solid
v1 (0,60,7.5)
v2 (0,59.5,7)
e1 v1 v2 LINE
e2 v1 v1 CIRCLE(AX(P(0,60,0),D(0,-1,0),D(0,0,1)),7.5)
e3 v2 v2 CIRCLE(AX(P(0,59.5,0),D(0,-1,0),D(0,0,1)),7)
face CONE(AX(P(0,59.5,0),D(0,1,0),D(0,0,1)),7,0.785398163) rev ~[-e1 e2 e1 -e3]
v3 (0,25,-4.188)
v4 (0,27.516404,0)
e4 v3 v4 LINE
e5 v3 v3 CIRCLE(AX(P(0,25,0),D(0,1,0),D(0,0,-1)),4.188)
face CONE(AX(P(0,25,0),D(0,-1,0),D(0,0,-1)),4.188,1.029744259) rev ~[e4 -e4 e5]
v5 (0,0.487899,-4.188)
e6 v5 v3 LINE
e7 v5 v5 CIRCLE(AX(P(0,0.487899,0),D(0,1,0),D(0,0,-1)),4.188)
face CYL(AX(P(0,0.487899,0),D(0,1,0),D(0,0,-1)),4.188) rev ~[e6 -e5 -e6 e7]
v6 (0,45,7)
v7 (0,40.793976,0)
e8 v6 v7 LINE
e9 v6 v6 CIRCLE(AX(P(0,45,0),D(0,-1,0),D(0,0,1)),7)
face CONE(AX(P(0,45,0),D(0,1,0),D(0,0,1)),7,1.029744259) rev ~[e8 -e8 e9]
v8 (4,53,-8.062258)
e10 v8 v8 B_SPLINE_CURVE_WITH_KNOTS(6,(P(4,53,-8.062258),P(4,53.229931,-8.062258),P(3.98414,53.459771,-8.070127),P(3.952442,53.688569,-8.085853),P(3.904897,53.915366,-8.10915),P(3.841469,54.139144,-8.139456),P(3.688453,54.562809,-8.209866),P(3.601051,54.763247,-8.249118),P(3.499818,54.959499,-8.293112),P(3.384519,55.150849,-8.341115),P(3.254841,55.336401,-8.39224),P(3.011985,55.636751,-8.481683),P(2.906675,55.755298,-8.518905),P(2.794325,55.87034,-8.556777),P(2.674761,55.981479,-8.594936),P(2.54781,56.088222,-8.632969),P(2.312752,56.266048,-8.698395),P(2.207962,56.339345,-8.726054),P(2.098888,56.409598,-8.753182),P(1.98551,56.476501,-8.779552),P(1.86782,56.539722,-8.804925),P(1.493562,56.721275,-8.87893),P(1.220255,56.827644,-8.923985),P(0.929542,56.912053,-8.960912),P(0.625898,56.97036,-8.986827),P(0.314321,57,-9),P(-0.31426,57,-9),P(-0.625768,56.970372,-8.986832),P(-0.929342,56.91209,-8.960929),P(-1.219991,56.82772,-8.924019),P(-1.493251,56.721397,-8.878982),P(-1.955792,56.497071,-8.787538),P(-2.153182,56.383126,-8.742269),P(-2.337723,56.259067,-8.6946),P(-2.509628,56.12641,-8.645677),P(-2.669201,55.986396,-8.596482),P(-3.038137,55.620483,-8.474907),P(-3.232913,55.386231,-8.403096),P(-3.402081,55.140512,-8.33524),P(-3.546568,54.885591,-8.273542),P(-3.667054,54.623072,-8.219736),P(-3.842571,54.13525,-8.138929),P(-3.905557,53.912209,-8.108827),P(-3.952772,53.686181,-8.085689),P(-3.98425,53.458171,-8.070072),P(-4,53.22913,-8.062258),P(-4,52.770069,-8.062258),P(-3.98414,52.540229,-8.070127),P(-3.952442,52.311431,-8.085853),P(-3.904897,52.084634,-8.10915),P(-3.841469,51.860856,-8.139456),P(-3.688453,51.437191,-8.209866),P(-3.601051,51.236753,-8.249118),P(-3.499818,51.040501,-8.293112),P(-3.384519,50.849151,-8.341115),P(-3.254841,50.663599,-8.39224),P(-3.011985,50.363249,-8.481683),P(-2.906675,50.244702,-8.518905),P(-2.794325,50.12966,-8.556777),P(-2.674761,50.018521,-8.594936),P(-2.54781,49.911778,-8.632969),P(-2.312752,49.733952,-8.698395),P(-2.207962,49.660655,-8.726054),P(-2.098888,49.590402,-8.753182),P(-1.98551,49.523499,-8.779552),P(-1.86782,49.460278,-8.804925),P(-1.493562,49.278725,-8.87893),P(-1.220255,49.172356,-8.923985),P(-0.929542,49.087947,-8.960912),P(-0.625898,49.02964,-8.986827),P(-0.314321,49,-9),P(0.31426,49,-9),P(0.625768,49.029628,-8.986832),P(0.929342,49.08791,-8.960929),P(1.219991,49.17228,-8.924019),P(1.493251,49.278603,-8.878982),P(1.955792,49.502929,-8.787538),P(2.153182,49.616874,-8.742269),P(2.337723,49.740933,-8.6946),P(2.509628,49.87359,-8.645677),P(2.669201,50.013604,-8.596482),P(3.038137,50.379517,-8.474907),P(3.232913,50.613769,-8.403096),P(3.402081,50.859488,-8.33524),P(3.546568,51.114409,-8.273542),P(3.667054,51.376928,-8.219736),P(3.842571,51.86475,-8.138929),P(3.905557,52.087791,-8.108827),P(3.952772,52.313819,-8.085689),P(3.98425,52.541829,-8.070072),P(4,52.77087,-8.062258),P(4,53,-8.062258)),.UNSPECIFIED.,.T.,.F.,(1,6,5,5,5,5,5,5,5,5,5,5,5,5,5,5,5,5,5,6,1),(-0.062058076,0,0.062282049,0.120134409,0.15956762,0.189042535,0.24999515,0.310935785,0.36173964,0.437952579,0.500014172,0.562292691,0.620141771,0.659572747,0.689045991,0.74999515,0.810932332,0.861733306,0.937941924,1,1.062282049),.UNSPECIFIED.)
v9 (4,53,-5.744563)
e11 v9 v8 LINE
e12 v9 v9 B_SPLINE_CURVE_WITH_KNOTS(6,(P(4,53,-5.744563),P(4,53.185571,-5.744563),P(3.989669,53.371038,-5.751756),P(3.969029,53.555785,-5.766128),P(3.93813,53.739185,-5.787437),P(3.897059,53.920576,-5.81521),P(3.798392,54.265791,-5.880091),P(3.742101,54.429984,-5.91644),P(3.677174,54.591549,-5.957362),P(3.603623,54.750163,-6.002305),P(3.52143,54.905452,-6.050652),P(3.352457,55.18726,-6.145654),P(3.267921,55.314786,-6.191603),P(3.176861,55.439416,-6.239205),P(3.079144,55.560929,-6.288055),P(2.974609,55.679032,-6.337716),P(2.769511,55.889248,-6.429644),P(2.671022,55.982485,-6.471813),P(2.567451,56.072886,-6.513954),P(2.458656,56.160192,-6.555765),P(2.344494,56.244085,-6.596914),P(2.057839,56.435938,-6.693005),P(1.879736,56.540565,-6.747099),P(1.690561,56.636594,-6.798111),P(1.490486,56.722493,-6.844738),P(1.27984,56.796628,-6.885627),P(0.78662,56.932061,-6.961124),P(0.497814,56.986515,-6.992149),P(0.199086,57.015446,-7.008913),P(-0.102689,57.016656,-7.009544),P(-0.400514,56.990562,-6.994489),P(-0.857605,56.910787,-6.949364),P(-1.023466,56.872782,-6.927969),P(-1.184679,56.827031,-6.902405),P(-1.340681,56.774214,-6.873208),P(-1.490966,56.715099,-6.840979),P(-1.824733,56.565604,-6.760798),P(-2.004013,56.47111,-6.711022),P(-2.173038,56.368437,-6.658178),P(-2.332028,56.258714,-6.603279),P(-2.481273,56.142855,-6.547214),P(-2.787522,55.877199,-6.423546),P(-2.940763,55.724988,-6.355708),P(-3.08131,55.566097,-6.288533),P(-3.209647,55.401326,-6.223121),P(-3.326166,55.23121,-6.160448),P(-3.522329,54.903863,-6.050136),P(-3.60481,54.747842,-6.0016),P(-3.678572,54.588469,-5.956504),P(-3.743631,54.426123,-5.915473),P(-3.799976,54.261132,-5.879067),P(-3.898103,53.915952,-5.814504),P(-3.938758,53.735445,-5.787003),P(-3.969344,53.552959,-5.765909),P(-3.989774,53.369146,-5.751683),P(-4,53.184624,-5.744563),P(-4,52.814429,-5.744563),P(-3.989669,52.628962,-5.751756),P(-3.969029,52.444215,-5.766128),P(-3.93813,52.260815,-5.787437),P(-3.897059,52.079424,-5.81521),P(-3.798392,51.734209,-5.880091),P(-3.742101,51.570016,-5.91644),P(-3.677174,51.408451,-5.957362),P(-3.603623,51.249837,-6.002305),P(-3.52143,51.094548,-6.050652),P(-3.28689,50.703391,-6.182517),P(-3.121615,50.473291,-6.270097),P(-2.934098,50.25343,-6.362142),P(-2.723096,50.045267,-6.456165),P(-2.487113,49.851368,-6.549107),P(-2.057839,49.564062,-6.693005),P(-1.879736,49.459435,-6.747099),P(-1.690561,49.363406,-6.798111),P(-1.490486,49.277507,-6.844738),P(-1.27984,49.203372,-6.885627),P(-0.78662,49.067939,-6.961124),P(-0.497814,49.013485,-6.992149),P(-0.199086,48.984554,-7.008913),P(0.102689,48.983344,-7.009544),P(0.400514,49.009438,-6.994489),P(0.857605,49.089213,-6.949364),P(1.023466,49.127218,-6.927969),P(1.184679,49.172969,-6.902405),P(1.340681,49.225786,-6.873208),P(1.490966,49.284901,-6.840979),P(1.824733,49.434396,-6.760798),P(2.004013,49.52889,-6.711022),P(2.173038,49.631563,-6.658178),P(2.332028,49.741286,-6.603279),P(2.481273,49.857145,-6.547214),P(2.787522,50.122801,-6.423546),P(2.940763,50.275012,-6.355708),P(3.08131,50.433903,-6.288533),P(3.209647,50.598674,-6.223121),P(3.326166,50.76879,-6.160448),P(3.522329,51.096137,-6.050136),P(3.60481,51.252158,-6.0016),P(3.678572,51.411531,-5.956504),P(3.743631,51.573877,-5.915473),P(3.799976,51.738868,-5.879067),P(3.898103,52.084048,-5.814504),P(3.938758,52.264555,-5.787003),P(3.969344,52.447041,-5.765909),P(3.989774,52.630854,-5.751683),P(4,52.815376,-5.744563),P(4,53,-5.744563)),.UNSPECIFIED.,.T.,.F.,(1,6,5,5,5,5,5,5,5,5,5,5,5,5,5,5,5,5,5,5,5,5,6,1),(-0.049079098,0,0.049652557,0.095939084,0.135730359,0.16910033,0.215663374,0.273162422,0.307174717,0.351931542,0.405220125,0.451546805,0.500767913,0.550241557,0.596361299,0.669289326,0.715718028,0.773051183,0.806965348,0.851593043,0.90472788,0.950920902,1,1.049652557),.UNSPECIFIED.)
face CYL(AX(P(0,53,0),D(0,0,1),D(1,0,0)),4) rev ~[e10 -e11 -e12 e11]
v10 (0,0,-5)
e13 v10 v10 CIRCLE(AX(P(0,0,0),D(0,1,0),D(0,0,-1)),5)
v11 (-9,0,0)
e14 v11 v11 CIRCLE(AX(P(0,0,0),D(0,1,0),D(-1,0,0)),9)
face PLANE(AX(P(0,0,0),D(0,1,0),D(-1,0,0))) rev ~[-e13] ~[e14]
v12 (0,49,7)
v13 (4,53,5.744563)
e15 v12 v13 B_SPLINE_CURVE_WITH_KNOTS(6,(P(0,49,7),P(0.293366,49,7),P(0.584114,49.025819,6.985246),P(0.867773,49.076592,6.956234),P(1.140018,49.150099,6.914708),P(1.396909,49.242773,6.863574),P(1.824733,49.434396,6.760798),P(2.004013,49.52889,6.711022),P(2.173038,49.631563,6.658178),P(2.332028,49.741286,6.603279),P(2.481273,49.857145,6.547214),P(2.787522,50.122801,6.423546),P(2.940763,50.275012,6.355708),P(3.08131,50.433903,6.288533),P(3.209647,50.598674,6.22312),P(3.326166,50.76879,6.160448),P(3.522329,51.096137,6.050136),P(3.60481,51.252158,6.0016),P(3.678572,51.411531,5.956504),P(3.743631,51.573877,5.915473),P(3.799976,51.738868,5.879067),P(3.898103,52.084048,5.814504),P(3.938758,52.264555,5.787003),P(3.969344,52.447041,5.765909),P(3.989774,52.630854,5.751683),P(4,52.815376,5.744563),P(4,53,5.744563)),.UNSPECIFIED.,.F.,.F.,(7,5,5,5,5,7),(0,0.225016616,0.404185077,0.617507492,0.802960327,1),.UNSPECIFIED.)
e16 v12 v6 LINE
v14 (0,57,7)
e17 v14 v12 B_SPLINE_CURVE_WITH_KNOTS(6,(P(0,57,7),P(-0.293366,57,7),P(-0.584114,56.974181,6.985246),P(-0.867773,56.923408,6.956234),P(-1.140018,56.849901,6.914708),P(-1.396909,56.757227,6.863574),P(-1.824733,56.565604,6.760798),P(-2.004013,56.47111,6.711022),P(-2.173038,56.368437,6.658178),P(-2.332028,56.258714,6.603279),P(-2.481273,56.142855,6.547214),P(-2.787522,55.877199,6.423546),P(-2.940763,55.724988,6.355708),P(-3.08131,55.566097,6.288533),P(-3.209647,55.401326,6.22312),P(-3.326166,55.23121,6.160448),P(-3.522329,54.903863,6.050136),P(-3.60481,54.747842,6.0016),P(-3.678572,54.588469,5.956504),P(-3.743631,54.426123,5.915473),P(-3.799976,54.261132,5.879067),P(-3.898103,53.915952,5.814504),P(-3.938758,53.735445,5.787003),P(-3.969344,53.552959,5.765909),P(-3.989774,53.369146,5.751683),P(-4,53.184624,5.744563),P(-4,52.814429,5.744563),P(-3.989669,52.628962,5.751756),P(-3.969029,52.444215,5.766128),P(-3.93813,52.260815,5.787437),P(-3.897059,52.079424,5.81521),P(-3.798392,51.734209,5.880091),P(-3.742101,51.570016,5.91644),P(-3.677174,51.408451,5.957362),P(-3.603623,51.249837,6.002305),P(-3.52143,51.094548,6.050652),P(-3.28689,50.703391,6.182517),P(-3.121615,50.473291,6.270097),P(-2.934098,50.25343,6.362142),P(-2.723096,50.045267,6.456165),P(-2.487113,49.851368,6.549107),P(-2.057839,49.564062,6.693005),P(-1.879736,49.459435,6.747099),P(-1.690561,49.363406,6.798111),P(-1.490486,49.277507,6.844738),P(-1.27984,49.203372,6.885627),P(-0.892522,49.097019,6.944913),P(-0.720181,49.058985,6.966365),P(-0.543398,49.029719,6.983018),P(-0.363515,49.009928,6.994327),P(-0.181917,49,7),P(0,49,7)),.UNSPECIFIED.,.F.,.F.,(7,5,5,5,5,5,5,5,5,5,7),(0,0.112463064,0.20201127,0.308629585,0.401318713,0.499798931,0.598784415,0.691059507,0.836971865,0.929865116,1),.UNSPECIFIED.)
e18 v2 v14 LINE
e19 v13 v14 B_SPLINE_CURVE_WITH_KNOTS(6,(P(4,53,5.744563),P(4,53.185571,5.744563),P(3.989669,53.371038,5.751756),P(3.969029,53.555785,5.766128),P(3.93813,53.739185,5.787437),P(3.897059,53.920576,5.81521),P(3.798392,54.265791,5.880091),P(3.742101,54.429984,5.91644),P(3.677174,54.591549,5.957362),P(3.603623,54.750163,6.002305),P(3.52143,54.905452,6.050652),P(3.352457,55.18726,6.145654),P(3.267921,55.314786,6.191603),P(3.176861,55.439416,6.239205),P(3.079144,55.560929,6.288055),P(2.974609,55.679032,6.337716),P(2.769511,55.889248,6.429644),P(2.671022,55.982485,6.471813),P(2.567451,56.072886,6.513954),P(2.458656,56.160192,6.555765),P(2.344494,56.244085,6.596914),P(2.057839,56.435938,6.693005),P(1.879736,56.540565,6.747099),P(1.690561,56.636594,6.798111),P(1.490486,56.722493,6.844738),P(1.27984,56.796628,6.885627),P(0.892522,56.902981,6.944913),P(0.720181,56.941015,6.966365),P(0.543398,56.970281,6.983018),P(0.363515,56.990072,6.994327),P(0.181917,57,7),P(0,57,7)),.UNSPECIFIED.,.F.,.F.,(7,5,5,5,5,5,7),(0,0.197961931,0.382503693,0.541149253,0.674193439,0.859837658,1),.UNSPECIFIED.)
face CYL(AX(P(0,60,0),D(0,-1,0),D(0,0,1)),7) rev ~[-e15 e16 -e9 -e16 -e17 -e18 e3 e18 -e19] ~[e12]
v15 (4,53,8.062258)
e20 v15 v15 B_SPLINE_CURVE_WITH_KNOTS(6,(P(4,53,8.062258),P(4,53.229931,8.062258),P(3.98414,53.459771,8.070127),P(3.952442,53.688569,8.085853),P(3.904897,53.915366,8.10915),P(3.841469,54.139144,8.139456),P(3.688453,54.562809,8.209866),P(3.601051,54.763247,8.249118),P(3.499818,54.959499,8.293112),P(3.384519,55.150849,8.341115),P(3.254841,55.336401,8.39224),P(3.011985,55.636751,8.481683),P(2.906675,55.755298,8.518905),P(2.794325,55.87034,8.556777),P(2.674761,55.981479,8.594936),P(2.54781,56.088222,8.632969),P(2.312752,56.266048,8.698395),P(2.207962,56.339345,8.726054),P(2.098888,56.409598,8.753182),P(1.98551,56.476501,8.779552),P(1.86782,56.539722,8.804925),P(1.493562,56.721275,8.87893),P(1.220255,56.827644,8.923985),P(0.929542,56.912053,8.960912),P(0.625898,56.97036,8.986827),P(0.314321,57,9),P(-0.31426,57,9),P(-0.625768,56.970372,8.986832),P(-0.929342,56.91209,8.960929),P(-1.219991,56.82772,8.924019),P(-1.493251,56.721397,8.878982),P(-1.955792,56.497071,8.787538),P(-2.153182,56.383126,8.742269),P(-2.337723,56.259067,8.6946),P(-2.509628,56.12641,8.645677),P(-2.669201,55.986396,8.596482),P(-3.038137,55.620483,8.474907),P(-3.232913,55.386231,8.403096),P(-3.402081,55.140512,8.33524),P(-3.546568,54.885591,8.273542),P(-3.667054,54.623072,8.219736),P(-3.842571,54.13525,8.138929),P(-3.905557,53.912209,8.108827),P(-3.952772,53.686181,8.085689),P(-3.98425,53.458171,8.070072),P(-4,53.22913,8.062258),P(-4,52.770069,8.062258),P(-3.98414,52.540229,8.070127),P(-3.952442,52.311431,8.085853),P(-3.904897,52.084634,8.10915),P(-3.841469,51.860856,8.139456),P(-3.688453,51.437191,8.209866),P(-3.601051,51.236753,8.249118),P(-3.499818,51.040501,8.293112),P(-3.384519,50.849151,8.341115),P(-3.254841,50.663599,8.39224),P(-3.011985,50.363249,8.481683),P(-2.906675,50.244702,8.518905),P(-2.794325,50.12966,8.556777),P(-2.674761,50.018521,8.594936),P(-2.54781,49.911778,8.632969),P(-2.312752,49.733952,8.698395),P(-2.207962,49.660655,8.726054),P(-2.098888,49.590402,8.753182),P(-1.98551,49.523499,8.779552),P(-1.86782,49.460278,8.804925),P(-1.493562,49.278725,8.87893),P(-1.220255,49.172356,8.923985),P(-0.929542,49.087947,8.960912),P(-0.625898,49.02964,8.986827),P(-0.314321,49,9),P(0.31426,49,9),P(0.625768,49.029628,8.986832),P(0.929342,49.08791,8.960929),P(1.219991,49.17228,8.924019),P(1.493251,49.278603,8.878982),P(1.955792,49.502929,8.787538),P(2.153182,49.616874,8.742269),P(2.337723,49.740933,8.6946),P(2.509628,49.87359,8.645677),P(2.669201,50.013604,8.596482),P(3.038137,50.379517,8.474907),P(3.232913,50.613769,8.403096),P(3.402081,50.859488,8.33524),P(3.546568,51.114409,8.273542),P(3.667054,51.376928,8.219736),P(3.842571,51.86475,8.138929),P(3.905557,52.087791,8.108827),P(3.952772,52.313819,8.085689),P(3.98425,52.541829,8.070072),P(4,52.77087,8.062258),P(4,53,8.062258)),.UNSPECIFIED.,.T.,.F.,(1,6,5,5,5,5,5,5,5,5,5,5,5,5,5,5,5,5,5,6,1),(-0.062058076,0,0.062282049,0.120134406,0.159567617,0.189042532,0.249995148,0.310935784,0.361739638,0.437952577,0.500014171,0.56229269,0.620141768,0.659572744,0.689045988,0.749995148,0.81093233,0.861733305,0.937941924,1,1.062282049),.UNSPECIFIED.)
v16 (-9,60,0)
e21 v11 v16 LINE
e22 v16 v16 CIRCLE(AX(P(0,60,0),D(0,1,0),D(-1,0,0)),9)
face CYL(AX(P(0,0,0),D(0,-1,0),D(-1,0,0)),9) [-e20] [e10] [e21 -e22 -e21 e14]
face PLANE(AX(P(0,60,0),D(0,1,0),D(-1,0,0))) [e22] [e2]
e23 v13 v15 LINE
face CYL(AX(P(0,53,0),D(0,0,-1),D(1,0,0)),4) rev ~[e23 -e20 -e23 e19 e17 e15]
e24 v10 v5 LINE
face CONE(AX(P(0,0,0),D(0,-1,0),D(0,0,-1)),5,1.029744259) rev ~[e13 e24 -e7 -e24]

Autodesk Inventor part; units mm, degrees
ref_plane "YZ Plane" through (0, 0, 0) normal (1, 0, 0) x (0, 1, 0)
ref_plane "XZ Plane" through (0, 0, 0) normal (0, 1, 0) x (-1, 0, 0)
ref_plane "XY Plane" through (0, 0, 0) normal (0, 0, 1) x (1, 0, 0)
sketch "Sketch2" plane through (0, 0, 0) normal (0, 1, 0) x (-1, 0, 0)
  circle A0 centre (0, 0) radius 9
  dimension "d2" = 18
extrude "Extrusion2" add sketch "Sketch2" along normal blind 60
hole "Hole1" at (0, 0, 0) direction (0, 1, 0) diameter 8.376 depth 25 tip angle 118 countersink diameter 10 countersink angle 118 thread size "M10x1.5" class "6H" standard "ISO Metric profile"
sketch "Sketch3" plane through (0, 60, 0) normal (0, 1, 0) x (1, 0, 0)
  point P0 (0, 0)
  point P1 (0, 0)
hole "Hole2" at (0, 60, 0) direction (0, -1, 0) diameter 14 depth 15 tip angle 118
sketch "Sketch4" plane through (0, 0, 0) normal (0, 0, 1) x (1, 0, 0)
  circle A0 centre (0, 53) radius 4
  line L0 (9, 60) -> (-9, 60) projected
  point P0 (0, 0)
  point P1 (0, 60)
  dimension "d20" = 8
  dimension "d21" = 7
extrude "Extrusion3" cut sketch "Sketch4" along normal through all both and the other way through all
chamfer "Chamfer3" distance 0.5 angle 45 1 edges at (0, 60, -7)
sketch "Sketch6" plane through (0, 60, 0) normal (0, 1, 0) x (1, 0, 0)
  circle A0 centre (0, 0) radius 9 projected
  line L0 (-9, 0) -> (9, 0)
  line L1 (9, 0) -> (9, 9)
  line L2 (9, 9) -> (-9, 9)
  line L3 (-9, 9) -> (-9, 0)
  dimension "d38" = 9
  dimension "d39" = 18
extrude "Extrusion5" [suppressed]
properties part number "RS-STT-103" material "11 110 (1.0721)"
